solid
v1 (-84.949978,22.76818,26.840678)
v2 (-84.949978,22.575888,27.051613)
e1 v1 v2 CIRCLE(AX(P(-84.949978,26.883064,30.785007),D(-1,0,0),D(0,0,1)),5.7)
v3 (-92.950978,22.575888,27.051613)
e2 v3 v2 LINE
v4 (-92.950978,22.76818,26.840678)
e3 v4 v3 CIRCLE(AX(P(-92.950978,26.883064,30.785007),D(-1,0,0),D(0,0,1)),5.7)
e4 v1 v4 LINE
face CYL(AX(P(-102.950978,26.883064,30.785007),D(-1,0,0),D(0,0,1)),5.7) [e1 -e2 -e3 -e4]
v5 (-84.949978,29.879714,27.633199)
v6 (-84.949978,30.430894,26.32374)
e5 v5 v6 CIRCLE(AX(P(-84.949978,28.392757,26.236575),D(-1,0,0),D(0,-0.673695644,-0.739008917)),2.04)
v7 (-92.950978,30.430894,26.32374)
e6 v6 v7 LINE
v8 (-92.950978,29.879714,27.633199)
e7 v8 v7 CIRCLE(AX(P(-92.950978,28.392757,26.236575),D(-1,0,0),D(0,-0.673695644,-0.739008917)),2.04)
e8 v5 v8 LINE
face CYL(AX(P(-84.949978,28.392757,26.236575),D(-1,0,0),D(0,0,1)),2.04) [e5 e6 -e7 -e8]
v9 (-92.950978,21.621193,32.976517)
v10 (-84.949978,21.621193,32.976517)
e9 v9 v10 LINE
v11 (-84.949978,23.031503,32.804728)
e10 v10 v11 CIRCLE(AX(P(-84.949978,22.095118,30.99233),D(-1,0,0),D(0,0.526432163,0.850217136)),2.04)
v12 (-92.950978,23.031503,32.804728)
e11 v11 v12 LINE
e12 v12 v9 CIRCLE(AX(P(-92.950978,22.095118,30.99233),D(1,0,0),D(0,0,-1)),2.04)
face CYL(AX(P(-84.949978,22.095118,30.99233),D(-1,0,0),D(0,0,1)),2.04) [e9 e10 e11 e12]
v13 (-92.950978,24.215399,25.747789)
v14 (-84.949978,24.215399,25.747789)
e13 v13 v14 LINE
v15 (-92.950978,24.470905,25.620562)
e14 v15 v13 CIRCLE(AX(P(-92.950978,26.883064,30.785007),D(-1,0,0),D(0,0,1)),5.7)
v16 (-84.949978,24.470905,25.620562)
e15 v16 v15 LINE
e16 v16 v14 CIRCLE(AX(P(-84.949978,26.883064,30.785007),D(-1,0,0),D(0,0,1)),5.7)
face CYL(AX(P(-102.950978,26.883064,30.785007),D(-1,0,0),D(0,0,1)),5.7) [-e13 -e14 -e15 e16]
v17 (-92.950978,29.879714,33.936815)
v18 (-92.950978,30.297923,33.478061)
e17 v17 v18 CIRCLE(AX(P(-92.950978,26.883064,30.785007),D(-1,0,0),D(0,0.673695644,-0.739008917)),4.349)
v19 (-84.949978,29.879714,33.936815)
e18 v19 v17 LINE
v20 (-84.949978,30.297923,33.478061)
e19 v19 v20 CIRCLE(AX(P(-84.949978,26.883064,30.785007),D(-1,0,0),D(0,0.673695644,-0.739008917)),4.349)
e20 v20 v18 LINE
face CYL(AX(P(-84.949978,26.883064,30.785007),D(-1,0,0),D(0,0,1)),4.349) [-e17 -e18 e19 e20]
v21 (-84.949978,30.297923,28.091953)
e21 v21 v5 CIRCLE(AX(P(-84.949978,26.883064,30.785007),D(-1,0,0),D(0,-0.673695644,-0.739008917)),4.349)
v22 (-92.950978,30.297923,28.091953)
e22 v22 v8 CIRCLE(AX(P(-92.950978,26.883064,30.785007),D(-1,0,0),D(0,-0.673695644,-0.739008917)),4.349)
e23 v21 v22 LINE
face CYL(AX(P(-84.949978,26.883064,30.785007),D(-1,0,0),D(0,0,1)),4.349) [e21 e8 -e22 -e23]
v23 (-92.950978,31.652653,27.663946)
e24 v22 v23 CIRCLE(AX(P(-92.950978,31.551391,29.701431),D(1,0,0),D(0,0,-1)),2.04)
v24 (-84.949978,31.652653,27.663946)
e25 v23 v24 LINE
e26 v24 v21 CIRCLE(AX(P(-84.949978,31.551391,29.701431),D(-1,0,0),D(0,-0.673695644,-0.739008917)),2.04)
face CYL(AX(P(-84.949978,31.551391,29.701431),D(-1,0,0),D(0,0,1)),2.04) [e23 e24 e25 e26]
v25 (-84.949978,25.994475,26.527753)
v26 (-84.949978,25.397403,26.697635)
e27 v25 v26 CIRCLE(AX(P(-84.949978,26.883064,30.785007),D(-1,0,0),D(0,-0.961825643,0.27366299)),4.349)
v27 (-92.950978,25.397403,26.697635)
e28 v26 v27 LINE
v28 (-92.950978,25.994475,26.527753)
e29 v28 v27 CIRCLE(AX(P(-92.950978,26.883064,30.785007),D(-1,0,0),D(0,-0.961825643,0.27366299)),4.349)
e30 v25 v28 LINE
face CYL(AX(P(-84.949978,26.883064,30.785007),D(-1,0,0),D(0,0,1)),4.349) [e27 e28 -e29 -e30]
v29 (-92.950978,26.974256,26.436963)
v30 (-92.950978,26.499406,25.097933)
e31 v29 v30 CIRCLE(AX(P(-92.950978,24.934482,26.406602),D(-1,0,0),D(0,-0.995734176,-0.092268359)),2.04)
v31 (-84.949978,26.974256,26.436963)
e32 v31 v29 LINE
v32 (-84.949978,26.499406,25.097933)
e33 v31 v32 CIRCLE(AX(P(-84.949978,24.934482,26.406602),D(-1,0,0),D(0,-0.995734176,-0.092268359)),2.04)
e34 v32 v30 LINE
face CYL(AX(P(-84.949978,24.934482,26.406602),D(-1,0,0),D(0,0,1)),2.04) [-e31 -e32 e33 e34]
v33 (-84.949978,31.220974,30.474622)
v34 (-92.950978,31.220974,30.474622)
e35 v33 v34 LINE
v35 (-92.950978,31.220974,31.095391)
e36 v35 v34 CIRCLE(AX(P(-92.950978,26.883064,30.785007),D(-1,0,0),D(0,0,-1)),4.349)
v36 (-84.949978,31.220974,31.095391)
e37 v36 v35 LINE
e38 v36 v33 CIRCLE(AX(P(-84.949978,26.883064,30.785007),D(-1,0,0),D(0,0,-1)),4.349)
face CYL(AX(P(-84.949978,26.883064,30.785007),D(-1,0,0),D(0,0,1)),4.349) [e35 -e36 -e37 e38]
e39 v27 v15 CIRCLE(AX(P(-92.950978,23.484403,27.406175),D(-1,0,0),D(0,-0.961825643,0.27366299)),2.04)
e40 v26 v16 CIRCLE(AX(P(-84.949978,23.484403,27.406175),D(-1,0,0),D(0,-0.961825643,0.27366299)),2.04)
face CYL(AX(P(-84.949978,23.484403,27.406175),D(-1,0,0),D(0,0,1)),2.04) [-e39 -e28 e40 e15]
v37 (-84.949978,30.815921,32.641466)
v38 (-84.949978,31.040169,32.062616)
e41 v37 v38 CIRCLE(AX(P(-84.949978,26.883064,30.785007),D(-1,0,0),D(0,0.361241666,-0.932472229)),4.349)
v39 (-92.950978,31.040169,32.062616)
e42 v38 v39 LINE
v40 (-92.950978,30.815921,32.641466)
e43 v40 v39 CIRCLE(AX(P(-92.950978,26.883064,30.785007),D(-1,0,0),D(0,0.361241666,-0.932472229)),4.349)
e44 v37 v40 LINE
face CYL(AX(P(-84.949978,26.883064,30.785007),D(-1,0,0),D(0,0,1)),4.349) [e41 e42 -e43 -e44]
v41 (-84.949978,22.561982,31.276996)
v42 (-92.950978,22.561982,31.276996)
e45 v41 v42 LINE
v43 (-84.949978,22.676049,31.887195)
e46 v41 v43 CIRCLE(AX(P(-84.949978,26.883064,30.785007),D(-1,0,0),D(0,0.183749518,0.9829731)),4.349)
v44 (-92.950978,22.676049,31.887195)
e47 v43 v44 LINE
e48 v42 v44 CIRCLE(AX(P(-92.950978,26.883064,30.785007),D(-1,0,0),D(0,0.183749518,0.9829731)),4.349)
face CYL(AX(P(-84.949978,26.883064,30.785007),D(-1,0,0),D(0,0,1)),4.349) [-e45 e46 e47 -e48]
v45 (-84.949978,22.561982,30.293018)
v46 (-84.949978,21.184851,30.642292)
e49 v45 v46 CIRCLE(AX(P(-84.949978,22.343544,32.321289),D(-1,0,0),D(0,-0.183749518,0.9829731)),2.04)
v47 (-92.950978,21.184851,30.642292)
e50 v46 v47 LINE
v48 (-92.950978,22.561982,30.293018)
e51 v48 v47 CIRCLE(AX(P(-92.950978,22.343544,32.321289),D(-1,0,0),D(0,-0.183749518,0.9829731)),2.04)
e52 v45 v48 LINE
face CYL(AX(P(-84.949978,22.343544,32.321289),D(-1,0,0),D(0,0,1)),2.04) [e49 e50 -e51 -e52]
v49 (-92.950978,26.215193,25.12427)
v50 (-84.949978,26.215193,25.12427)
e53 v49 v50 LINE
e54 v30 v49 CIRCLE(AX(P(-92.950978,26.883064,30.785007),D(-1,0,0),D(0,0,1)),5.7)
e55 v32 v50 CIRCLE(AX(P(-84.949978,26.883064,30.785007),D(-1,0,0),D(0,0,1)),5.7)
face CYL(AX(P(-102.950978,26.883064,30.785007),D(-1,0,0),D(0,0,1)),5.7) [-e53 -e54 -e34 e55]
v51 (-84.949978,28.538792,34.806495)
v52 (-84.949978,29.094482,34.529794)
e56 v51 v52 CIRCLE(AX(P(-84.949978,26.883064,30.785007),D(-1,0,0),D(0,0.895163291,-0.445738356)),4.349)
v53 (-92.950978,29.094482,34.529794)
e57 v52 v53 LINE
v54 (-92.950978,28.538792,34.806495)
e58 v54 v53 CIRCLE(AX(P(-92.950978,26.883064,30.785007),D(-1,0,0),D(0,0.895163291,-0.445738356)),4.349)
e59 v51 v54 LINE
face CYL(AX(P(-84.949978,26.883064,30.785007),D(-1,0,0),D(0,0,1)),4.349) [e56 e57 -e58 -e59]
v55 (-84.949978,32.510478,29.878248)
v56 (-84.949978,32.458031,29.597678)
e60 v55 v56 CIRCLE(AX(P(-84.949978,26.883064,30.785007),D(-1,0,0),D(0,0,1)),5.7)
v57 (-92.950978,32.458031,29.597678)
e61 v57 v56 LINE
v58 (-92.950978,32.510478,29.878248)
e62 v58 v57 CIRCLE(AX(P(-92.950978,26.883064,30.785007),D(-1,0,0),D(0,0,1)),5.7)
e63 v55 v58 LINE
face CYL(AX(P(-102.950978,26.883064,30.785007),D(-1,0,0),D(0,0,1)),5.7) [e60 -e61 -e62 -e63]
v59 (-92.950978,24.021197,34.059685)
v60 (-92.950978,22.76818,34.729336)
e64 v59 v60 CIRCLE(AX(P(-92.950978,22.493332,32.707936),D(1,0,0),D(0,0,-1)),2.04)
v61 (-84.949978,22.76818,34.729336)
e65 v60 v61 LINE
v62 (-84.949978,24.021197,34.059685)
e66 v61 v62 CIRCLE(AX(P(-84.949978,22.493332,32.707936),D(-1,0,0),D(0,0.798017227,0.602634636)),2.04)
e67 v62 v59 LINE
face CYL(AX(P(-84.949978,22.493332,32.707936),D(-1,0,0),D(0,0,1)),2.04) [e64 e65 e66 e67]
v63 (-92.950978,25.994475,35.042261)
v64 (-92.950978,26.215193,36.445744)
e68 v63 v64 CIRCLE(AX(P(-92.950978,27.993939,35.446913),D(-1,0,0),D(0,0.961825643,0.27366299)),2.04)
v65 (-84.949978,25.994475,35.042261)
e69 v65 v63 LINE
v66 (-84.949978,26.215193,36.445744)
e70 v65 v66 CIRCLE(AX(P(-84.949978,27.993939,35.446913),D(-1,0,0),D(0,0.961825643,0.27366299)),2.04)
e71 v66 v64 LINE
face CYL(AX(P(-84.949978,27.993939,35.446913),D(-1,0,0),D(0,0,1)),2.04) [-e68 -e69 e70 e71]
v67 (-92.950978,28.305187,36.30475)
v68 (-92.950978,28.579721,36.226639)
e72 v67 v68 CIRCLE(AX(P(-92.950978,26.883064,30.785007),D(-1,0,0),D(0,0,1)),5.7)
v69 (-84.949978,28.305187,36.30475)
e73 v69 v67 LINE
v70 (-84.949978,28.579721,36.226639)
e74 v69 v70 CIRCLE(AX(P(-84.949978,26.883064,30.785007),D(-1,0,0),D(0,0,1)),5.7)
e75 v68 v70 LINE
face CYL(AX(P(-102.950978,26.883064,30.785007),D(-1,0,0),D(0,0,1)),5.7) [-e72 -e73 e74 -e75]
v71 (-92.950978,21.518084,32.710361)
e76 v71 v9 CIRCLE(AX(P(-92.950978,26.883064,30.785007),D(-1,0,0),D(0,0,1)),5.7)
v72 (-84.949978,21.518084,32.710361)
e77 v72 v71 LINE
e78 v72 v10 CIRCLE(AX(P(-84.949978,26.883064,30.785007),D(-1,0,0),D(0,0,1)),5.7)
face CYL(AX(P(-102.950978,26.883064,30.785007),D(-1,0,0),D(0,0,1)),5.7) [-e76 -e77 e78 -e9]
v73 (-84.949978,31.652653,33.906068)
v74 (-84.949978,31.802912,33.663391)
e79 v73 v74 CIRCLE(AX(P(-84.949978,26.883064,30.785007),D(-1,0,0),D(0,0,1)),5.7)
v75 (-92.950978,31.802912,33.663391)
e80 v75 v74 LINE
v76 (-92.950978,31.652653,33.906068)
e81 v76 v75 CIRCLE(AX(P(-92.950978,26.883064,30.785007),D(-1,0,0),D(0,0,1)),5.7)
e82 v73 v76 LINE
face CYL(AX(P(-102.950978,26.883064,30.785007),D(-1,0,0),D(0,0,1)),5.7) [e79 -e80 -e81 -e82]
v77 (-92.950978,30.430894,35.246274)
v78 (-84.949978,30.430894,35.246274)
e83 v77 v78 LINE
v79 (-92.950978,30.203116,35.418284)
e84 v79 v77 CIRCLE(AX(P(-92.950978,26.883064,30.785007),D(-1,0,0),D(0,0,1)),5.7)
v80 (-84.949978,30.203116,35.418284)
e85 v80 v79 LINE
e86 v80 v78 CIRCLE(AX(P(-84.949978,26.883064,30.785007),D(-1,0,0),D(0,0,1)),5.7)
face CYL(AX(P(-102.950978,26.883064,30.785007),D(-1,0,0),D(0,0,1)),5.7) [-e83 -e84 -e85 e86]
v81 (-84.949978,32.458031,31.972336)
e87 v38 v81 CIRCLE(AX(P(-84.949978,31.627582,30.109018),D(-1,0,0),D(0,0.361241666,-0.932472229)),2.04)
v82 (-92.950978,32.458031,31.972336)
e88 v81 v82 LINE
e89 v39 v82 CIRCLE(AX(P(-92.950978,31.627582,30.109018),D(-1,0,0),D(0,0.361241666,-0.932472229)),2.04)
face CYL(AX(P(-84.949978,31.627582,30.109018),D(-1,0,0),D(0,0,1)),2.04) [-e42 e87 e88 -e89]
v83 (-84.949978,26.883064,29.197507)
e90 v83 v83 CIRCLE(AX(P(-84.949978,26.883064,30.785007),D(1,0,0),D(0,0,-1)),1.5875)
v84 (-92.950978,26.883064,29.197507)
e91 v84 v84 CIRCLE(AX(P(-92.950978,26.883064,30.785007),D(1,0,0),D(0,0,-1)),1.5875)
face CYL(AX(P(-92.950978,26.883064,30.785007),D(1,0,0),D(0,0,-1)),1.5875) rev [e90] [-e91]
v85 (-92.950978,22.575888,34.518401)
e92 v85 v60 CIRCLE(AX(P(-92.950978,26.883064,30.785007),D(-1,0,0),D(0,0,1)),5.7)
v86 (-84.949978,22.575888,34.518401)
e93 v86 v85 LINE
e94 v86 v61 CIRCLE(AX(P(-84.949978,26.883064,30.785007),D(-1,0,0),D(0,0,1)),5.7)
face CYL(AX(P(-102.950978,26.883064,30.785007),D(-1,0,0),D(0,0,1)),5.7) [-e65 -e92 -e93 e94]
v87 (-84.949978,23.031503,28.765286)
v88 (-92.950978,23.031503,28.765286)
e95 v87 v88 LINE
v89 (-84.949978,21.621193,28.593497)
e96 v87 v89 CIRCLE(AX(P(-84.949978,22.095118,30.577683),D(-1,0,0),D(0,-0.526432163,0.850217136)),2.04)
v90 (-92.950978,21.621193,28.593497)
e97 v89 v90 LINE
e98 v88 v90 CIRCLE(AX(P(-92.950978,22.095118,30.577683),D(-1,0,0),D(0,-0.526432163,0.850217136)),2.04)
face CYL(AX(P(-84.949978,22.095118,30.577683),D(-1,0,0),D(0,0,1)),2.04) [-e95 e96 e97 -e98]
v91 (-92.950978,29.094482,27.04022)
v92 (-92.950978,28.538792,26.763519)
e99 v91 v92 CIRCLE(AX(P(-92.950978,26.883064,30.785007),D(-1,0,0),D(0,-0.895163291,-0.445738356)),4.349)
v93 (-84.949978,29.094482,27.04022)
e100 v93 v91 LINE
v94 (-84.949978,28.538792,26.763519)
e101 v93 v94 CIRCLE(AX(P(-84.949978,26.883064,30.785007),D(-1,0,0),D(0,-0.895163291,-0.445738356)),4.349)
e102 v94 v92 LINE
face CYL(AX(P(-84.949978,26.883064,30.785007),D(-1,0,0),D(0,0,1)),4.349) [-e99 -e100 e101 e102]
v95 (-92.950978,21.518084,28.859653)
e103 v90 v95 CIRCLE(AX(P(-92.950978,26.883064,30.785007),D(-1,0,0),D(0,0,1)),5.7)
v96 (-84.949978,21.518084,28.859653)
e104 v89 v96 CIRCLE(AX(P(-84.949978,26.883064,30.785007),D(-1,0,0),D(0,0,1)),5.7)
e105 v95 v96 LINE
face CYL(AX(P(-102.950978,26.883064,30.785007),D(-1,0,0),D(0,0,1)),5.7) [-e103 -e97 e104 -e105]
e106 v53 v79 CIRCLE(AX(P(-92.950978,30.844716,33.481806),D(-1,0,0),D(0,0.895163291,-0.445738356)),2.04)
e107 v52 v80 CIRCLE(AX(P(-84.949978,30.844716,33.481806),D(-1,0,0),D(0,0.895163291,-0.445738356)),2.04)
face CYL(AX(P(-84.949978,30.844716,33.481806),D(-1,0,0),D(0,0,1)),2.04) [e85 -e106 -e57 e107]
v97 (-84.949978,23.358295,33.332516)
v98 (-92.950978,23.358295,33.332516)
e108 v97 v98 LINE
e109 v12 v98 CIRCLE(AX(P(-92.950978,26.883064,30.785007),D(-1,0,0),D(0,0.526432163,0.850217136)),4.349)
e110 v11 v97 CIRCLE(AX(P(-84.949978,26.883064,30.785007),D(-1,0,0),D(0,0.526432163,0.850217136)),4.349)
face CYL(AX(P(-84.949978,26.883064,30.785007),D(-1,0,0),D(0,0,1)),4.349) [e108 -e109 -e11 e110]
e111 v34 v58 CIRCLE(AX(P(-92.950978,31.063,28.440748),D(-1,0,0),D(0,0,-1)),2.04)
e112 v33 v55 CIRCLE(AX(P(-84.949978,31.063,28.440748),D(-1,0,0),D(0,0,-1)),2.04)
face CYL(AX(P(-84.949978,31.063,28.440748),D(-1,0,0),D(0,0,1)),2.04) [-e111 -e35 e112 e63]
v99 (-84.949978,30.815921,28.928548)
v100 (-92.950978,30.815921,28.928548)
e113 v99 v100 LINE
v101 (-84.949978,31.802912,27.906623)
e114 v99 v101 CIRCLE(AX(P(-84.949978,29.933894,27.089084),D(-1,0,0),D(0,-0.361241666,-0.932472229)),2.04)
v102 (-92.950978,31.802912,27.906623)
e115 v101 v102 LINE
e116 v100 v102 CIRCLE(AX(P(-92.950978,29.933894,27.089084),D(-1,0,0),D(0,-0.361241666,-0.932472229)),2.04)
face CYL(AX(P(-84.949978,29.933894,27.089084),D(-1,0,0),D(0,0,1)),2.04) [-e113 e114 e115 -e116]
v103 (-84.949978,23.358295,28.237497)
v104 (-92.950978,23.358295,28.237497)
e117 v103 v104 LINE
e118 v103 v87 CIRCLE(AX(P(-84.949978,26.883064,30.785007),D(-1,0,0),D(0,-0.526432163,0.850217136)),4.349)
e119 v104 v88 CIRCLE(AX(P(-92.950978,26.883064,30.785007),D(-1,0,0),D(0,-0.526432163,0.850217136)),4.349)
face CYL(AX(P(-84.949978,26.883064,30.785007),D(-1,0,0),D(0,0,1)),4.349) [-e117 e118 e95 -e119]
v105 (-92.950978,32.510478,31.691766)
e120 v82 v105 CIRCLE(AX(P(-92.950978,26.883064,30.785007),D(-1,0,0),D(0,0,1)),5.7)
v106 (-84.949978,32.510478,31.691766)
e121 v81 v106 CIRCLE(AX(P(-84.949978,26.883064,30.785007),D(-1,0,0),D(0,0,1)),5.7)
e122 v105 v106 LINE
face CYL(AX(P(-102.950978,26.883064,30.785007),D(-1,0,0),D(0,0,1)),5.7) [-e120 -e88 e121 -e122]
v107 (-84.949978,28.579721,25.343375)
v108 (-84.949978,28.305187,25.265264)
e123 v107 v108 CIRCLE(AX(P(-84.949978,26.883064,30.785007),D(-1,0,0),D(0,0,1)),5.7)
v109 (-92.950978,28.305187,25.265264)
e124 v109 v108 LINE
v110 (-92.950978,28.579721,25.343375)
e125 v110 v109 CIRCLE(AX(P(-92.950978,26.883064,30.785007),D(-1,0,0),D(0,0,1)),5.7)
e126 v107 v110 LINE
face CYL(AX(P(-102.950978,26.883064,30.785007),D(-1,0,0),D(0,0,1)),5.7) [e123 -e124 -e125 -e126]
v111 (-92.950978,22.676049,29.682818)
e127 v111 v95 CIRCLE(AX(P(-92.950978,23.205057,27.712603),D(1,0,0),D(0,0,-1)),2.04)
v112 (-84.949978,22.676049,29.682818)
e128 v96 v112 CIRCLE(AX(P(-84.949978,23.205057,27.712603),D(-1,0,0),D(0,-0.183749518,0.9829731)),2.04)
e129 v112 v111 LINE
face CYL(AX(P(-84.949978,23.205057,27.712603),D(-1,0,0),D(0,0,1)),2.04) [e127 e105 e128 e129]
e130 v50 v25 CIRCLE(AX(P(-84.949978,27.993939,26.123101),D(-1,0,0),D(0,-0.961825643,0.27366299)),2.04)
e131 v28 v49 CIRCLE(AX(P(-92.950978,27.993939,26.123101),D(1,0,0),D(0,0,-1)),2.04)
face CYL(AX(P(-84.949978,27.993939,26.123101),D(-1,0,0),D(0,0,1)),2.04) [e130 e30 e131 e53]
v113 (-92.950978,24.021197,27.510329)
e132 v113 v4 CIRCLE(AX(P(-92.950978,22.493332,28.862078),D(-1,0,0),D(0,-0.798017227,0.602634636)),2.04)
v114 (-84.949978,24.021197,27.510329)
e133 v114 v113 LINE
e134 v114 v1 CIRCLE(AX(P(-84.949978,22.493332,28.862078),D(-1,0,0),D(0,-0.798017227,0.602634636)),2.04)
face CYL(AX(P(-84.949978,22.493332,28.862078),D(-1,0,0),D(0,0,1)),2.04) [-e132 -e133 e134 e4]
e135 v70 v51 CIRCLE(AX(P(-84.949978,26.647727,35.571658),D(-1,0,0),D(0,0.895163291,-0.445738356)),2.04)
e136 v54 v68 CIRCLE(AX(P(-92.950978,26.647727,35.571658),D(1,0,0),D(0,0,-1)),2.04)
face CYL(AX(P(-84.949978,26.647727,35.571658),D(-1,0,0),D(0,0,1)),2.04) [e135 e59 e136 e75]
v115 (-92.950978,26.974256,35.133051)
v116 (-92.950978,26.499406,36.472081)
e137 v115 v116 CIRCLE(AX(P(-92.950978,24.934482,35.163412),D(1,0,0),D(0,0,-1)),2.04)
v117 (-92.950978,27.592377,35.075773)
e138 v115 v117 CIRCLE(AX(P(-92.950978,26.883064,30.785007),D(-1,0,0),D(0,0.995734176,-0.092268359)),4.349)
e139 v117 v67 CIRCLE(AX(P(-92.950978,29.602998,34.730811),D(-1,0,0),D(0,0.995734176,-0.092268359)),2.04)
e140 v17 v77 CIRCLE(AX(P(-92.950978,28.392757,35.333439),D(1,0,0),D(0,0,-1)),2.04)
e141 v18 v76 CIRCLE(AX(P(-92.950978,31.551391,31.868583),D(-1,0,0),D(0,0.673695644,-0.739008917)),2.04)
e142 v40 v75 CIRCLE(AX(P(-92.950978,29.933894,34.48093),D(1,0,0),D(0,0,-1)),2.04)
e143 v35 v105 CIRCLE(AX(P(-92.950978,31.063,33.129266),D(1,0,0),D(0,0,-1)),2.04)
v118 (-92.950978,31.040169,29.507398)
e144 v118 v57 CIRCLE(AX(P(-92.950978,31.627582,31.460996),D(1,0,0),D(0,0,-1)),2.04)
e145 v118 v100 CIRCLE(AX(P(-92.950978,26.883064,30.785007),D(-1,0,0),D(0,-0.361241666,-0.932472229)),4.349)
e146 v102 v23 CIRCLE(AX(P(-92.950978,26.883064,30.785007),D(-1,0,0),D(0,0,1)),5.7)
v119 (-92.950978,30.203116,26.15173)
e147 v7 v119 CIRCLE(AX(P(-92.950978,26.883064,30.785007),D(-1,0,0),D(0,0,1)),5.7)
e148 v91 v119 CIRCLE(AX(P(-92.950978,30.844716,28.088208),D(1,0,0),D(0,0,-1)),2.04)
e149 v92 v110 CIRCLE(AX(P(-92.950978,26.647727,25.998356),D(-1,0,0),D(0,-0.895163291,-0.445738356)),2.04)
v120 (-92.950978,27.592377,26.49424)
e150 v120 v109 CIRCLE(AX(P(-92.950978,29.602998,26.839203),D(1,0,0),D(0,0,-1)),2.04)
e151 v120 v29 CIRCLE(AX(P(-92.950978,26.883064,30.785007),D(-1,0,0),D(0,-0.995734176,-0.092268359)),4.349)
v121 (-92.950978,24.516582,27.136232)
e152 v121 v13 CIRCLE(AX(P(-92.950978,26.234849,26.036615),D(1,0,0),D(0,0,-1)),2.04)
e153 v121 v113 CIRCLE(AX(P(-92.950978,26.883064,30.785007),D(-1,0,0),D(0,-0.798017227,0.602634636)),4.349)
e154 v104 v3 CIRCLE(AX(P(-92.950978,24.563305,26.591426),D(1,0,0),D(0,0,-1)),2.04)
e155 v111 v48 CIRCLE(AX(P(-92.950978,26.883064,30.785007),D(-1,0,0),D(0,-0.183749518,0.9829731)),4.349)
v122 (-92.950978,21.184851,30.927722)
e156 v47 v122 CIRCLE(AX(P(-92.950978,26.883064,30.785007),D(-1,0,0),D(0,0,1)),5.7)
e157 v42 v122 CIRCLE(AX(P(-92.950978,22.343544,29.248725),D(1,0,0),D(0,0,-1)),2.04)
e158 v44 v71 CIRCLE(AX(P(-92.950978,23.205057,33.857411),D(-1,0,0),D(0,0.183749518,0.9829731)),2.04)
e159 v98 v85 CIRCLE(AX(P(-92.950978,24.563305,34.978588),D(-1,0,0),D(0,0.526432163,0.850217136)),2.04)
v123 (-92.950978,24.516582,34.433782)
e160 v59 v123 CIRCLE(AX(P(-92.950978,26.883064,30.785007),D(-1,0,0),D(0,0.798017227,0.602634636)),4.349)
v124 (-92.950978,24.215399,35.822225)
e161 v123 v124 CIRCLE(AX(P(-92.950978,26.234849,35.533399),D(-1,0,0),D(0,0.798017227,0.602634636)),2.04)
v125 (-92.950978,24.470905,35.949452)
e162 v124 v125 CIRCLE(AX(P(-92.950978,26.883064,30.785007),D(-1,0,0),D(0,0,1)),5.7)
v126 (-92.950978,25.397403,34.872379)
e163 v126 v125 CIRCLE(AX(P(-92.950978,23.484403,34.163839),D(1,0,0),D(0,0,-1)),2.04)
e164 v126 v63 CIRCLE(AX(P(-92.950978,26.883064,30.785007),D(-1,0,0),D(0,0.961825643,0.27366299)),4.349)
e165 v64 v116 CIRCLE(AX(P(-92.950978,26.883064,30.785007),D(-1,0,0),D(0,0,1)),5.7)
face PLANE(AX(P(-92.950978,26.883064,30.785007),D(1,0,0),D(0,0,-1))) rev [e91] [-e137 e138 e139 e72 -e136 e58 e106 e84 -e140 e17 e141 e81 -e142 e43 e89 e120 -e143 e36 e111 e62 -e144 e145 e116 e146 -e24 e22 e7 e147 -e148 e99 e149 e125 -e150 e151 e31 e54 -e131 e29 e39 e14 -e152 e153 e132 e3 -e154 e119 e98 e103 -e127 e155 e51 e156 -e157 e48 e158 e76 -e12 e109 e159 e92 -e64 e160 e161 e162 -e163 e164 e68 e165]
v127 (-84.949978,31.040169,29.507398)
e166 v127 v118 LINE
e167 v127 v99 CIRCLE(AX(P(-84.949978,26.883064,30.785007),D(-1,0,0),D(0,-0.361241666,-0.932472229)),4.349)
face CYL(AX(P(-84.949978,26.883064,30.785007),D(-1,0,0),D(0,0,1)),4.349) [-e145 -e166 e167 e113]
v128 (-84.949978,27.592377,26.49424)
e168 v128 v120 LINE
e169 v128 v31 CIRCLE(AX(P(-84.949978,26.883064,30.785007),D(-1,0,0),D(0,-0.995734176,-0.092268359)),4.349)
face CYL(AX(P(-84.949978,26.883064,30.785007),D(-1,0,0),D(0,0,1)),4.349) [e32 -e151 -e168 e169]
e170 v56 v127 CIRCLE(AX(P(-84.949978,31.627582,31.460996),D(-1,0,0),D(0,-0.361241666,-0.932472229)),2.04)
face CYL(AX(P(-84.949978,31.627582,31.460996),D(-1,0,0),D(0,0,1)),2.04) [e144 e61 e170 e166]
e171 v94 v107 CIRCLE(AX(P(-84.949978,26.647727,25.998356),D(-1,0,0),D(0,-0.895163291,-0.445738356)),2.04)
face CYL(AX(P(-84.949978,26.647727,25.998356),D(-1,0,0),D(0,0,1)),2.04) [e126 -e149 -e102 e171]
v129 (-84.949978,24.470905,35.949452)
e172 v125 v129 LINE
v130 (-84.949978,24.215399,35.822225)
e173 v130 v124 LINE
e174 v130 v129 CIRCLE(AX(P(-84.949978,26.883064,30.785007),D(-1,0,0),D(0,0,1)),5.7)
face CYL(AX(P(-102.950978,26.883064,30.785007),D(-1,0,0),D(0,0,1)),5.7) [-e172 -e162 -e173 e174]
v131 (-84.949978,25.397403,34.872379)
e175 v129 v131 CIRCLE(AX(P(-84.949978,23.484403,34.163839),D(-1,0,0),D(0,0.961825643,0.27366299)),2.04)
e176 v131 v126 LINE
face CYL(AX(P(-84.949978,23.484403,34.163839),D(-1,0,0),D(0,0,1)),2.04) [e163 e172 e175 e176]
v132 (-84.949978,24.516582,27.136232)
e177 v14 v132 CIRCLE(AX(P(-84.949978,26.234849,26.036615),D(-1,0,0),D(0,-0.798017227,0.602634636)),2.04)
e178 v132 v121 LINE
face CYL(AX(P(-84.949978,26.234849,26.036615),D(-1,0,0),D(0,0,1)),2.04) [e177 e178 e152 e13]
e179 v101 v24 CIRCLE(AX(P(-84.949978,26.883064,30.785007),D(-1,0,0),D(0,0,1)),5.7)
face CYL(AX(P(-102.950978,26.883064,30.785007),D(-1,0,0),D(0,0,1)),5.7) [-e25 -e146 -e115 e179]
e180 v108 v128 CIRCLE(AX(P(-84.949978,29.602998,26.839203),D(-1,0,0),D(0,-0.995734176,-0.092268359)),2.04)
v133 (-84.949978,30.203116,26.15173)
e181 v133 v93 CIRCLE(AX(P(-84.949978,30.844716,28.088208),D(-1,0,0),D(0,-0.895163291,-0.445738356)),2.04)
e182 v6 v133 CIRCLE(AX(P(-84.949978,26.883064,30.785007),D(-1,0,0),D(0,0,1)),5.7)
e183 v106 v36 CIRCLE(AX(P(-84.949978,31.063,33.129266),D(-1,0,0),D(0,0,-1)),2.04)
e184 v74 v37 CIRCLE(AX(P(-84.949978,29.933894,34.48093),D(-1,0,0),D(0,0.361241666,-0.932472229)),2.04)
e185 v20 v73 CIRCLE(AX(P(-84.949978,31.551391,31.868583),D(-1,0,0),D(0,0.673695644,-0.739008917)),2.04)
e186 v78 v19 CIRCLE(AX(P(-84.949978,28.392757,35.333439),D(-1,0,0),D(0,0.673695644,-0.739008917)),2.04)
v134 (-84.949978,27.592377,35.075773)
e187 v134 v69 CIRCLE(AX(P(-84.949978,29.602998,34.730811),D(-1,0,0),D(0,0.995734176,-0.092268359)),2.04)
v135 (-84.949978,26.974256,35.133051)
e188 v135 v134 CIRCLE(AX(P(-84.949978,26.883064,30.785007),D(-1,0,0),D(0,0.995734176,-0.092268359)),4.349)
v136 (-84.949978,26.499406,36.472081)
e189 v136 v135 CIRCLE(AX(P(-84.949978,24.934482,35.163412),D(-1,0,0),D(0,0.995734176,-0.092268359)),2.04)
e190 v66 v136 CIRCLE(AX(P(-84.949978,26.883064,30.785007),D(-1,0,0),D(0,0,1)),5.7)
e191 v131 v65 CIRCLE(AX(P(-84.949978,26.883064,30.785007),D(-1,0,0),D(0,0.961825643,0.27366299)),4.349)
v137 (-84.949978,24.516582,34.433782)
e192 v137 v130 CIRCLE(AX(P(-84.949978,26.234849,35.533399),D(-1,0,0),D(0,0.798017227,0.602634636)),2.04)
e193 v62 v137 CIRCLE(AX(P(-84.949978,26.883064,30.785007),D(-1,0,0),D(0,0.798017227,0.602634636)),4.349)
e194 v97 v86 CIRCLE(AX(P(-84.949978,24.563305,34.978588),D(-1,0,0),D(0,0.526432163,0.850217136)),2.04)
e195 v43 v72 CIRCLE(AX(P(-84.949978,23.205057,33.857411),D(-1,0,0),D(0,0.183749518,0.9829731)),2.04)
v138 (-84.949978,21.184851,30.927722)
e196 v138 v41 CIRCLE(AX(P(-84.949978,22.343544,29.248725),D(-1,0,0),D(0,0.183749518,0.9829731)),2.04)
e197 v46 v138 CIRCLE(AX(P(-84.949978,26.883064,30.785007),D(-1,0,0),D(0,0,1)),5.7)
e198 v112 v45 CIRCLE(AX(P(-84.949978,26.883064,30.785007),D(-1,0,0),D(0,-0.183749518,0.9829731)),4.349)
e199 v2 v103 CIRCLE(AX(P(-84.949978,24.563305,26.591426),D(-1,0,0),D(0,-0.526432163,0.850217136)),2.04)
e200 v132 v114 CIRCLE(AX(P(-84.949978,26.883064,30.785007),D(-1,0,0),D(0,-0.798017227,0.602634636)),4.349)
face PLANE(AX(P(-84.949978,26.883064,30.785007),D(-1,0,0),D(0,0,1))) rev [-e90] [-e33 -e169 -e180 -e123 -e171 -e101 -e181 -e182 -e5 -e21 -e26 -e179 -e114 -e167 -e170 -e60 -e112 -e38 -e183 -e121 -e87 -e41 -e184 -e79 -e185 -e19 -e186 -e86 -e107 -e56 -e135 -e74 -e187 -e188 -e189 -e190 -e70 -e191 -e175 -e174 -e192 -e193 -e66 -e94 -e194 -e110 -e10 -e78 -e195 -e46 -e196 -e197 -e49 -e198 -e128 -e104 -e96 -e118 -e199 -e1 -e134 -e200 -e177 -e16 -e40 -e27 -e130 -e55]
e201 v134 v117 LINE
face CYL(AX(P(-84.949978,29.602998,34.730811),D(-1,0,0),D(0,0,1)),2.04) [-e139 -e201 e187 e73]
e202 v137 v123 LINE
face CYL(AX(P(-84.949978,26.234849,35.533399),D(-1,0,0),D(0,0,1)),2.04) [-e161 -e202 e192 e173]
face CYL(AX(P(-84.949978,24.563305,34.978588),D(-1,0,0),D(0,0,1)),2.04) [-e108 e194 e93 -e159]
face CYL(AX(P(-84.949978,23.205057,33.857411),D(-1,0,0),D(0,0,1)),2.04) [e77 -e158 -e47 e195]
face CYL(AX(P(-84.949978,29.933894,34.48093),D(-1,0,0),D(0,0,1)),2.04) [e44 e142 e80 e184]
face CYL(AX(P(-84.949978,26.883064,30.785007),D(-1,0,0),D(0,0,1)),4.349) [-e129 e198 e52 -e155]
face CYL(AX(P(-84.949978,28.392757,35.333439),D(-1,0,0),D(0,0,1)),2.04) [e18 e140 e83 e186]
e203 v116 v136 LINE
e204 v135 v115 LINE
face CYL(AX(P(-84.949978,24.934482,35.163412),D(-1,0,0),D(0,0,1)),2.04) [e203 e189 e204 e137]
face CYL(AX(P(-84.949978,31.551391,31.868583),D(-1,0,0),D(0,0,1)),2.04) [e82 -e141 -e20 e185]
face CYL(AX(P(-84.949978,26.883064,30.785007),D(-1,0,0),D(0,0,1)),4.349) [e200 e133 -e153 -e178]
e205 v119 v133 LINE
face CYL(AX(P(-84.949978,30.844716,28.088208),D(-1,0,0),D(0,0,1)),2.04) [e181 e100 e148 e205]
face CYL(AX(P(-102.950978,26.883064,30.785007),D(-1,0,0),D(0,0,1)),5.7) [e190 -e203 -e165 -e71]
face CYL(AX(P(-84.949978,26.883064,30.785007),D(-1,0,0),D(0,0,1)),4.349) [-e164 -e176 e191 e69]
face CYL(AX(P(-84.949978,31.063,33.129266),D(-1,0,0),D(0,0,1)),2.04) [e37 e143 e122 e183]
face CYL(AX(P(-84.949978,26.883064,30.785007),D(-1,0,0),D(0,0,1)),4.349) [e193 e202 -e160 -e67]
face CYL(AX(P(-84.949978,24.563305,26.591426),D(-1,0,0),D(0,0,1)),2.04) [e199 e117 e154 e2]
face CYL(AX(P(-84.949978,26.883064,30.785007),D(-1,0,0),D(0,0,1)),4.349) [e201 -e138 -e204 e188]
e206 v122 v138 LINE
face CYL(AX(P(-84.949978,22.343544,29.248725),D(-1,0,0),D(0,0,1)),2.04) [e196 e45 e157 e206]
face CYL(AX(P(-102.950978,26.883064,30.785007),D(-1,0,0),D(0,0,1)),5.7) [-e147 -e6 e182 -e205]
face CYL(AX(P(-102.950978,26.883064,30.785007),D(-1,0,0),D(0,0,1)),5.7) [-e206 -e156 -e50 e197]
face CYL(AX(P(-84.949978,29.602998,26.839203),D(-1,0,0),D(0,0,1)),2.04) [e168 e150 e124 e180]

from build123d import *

# Parameters (mm, degrees)
SPUR_START             = -92.950977625
SPUR_GEAR_AM_OUTLINE_R = 1.5
SPUR_GEAR_AM_DEPTH     = 8.001
SKETCH1_R              = 1.5875
CUT_EXTRUDE1_DEPTH     = 50.509189617


# Read off the part's stored shape, not the designer's step: spur gear_am
with BuildPart() as part:
    # spur gear_am outline → spur gear_am (new body)
    with BuildSketch(Plane.YZ.offset(SPUR_START)):
        with BuildLine():
            ThreePointArc((31.652652911, 27.663945588), (31.729301927, 27.784343625), (31.802912423, 27.906623033))
            ThreePointArc((31.802912423, 27.906623033), (31.401254023, 28.50628356), (30.815920965, 28.928548203))
            ThreePointArc((30.815920965, 28.928548203), (30.938385979, 29.213966947), (31.040168606, 29.50739809))
            ThreePointArc((31.040168606, 29.50739809), (31.757212806, 29.425119095), (32.45803063, 29.597678058))
            ThreePointArc((32.45803063, 29.597678058), (32.486010922, 29.737634702), (32.510478248, 29.878248033))
            ThreePointArc((32.510478248, 29.878248033), (31.919320576, 30.292319071), (31.220974171, 30.474622435))
            ThreePointArc((31.220974171, 30.474622435), (31.232064254, 30.785006953), (31.220974171, 31.095391471))
            ThreePointArc((31.220974171, 31.095391471), (31.919320576, 31.277694835), (32.510478248, 31.691765874))
            ThreePointArc((32.510478248, 31.691765874), (32.486010922, 31.832379205), (32.45803063, 31.972335848))
            ThreePointArc((32.45803063, 31.972335848), (31.757212806, 32.144894811), (31.040168606, 32.062615816))
            ThreePointArc((31.040168606, 32.062615816), (30.938385979, 32.356046959), (30.815920965, 32.641465703))
            ThreePointArc((30.815920965, 32.641465703), (31.401254023, 33.063730346), (31.802912423, 33.663390873))
            ThreePointArc((31.802912423, 33.663390873), (31.729301927, 33.785670282), (31.652652911, 33.906068318))
            ThreePointArc((31.652652911, 33.906068318), (30.936824265, 33.81381016), (30.297923062, 33.47806104))
            ThreePointArc((30.297923062, 33.47806104), (30.097014035, 33.714909307), (29.879713667, 33.936814893))
            ThreePointArc((29.879713667, 33.936814893), (30.272980906, 34.542011636), (30.430893842, 35.246274174))
            ThreePointArc((30.430893842, 35.246274174), (30.318081681, 35.333705149), (30.203115814, 35.418284156))
            ThreePointArc((30.203115814, 35.418284156), (29.568952972, 35.073668852), (29.094481914, 34.529794388))
            ThreePointArc((29.094481914, 34.529794388), (28.821580363, 34.678072107), (28.538792261, 34.806494957))
            ThreePointArc((28.538792261, 34.806494957), (28.68688076, 35.512888625), (28.579721215, 36.226638616))
            ThreePointArc((28.579721215, 36.226638616), (28.442943297, 36.267413119), (28.305187358, 36.304750233))
            ThreePointArc((28.305187358, 36.304750233), (27.838337524, 35.754319991), (27.592376558, 35.075773441))
            ThreePointArc((27.592376558, 35.075773441), (27.284339349, 35.115454886), (26.974255613, 35.133050782))
            ThreePointArc((26.974255613, 35.133050782), (26.8571652, 35.845238996), (26.499405664, 36.472080549))
            ThreePointArc((26.499405664, 36.472080549), (26.357134605, 36.460691758), (26.215193296, 36.445744395))
            ThreePointArc((26.215193296, 36.445744395), (25.978707128, 35.763837869), (25.994474644, 35.042260705))
            ThreePointArc((25.994474644, 35.042260705), (25.69290391, 34.967986675), (25.397403066, 34.872379194))
            ThreePointArc((25.397403066, 34.872379194), (25.030947451, 35.494176991), (24.470905332, 35.94945168))
            ThreePointArc((24.470905332, 35.94945168), (24.342355626, 35.887437714), (24.215398907, 35.822224598))
            ThreePointArc((24.215398907, 35.822224598), (24.241215173, 35.100937042), (24.51658168, 34.433782259))
            ThreePointArc((24.51658168, 34.433782259), (24.26220622, 34.255583875), (24.021197296, 34.059685336))
            ThreePointArc((24.021197296, 34.059685336), (23.454868339, 34.507115477), (22.768180428, 34.729335933))
            ThreePointArc((22.768180428, 34.729335933), (22.670713426, 34.625072122), (22.575887506, 34.518400646))
            ThreePointArc((22.575887506, 34.518400646), (22.860519576, 33.855145941), (23.358295302, 33.332516489))
            ThreePointArc((23.358295302, 33.332516489), (23.18546993, 33.074460429), (23.031502516, 32.804728017))
            ThreePointArc((23.031502516, 32.804728017), (22.341786081, 33.017362582), (21.621193386, 32.976516701))
            ThreePointArc((21.621193386, 32.976516701), (21.567972546, 32.84408445), (21.518084191, 32.710361188))
            ThreePointArc((21.518084191, 32.710361188), (22.023090926, 32.194715558), (22.676048502, 31.88719544))
            ThreePointArc((22.676048502, 31.88719544), (22.608114243, 31.584133606), (22.561982491, 31.276996177))
            ThreePointArc((22.561982491, 31.276996177), (21.842028605, 31.22611769), (21.184851162, 30.927721934))
            ThreePointArc((21.184851162, 30.927721934), (21.183064254, 30.785006953), (21.184851162, 30.642291972))
            ThreePointArc((21.184851162, 30.642291972), (21.842028605, 30.343896216), (22.561982491, 30.293017729))
            ThreePointArc((22.561982491, 30.293017729), (22.608114243, 29.9858803), (22.676048502, 29.682818466))
            ThreePointArc((22.676048502, 29.682818466), (22.023090926, 29.375298348), (21.518084191, 28.859652718))
            ThreePointArc((21.518084191, 28.859652718), (21.567972546, 28.725929456), (21.621193386, 28.593497205))
            ThreePointArc((21.621193386, 28.593497205), (22.341786081, 28.552651324), (23.031502516, 28.765285889))
            ThreePointArc((23.031502516, 28.765285889), (23.18546993, 28.495553477), (23.358295302, 28.237497417))
            ThreePointArc((23.358295302, 28.237497417), (22.860519576, 27.714867965), (22.575887506, 27.051613261))
            ThreePointArc((22.575887506, 27.051613261), (22.670713426, 26.944941784), (22.768180428, 26.840677973))
            ThreePointArc((22.768180428, 26.840677973), (23.454868339, 27.062898429), (24.021197296, 27.51032857))
            ThreePointArc((24.021197296, 27.51032857), (24.26220622, 27.314430032), (24.51658168, 27.136231648))
            ThreePointArc((24.51658168, 27.136231648), (24.241215173, 26.469076865), (24.215398907, 25.747789309))
            ThreePointArc((24.215398907, 25.747789309), (24.342355626, 25.682576192), (24.470905332, 25.620562226))
            ThreePointArc((24.470905332, 25.620562226), (25.030947451, 26.075836915), (25.397403066, 26.697634712))
            ThreePointArc((25.397403066, 26.697634712), (25.69290391, 26.602027231), (25.994474644, 26.527753202))
            ThreePointArc((25.994474644, 26.527753202), (25.978707128, 25.806176038), (26.215193296, 25.124269511))
            ThreePointArc((26.215193296, 25.124269511), (26.357134605, 25.109322148), (26.499405664, 25.097933357))
            ThreePointArc((26.499405664, 25.097933357), (26.8571652, 25.72477491), (26.974255613, 26.436963124))
            ThreePointArc((26.974255613, 26.436963124), (27.284339349, 26.45455902), (27.592376558, 26.494240465))
            ThreePointArc((27.592376558, 26.494240465), (27.838337524, 25.815693915), (28.305187358, 25.265263673))
            ThreePointArc((28.305187358, 25.265263673), (28.442943297, 25.302600787), (28.579721215, 25.34337529))
            ThreePointArc((28.579721215, 25.34337529), (28.68688076, 26.057125281), (28.538792261, 26.763518949))
            ThreePointArc((28.538792261, 26.763518949), (28.821580363, 26.891941799), (29.094481914, 27.040219519))
            ThreePointArc((29.094481914, 27.040219519), (29.568952972, 26.496345054), (30.203115814, 26.151729751))
            ThreePointArc((30.203115814, 26.151729751), (30.318081681, 26.236308758), (30.430893842, 26.323739732))
            ThreePointArc((30.430893842, 26.323739732), (30.272980906, 27.02800227), (29.879713667, 27.633199013))
            ThreePointArc((29.879713667, 27.633199013), (30.097014035, 27.855104599), (30.297923062, 28.091952866))
            ThreePointArc((30.297923062, 28.091952866), (30.936824265, 27.756203746), (31.652652911, 27.663945588))
        make_face()
        with Locations((26.883064254, 30.785006953)):
            Circle(SPUR_GEAR_AM_OUTLINE_R, mode=Mode.SUBTRACT)
    extrude(amount=SPUR_GEAR_AM_DEPTH)

    # Sketch1 → Cut-Extrude1 (cut, through all)
    with BuildSketch(Plane(origin=(-84.949977625, 0, 0), x_dir=(0, 0, -1), z_dir=(1, 0, 0))):
        with Locations((-30.785006953, 26.883064254)):
            Circle(SKETCH1_R)
    extrude(amount=-CUT_EXTRUDE1_DEPTH, mode=Mode.SUBTRACT)


solid = part.part
